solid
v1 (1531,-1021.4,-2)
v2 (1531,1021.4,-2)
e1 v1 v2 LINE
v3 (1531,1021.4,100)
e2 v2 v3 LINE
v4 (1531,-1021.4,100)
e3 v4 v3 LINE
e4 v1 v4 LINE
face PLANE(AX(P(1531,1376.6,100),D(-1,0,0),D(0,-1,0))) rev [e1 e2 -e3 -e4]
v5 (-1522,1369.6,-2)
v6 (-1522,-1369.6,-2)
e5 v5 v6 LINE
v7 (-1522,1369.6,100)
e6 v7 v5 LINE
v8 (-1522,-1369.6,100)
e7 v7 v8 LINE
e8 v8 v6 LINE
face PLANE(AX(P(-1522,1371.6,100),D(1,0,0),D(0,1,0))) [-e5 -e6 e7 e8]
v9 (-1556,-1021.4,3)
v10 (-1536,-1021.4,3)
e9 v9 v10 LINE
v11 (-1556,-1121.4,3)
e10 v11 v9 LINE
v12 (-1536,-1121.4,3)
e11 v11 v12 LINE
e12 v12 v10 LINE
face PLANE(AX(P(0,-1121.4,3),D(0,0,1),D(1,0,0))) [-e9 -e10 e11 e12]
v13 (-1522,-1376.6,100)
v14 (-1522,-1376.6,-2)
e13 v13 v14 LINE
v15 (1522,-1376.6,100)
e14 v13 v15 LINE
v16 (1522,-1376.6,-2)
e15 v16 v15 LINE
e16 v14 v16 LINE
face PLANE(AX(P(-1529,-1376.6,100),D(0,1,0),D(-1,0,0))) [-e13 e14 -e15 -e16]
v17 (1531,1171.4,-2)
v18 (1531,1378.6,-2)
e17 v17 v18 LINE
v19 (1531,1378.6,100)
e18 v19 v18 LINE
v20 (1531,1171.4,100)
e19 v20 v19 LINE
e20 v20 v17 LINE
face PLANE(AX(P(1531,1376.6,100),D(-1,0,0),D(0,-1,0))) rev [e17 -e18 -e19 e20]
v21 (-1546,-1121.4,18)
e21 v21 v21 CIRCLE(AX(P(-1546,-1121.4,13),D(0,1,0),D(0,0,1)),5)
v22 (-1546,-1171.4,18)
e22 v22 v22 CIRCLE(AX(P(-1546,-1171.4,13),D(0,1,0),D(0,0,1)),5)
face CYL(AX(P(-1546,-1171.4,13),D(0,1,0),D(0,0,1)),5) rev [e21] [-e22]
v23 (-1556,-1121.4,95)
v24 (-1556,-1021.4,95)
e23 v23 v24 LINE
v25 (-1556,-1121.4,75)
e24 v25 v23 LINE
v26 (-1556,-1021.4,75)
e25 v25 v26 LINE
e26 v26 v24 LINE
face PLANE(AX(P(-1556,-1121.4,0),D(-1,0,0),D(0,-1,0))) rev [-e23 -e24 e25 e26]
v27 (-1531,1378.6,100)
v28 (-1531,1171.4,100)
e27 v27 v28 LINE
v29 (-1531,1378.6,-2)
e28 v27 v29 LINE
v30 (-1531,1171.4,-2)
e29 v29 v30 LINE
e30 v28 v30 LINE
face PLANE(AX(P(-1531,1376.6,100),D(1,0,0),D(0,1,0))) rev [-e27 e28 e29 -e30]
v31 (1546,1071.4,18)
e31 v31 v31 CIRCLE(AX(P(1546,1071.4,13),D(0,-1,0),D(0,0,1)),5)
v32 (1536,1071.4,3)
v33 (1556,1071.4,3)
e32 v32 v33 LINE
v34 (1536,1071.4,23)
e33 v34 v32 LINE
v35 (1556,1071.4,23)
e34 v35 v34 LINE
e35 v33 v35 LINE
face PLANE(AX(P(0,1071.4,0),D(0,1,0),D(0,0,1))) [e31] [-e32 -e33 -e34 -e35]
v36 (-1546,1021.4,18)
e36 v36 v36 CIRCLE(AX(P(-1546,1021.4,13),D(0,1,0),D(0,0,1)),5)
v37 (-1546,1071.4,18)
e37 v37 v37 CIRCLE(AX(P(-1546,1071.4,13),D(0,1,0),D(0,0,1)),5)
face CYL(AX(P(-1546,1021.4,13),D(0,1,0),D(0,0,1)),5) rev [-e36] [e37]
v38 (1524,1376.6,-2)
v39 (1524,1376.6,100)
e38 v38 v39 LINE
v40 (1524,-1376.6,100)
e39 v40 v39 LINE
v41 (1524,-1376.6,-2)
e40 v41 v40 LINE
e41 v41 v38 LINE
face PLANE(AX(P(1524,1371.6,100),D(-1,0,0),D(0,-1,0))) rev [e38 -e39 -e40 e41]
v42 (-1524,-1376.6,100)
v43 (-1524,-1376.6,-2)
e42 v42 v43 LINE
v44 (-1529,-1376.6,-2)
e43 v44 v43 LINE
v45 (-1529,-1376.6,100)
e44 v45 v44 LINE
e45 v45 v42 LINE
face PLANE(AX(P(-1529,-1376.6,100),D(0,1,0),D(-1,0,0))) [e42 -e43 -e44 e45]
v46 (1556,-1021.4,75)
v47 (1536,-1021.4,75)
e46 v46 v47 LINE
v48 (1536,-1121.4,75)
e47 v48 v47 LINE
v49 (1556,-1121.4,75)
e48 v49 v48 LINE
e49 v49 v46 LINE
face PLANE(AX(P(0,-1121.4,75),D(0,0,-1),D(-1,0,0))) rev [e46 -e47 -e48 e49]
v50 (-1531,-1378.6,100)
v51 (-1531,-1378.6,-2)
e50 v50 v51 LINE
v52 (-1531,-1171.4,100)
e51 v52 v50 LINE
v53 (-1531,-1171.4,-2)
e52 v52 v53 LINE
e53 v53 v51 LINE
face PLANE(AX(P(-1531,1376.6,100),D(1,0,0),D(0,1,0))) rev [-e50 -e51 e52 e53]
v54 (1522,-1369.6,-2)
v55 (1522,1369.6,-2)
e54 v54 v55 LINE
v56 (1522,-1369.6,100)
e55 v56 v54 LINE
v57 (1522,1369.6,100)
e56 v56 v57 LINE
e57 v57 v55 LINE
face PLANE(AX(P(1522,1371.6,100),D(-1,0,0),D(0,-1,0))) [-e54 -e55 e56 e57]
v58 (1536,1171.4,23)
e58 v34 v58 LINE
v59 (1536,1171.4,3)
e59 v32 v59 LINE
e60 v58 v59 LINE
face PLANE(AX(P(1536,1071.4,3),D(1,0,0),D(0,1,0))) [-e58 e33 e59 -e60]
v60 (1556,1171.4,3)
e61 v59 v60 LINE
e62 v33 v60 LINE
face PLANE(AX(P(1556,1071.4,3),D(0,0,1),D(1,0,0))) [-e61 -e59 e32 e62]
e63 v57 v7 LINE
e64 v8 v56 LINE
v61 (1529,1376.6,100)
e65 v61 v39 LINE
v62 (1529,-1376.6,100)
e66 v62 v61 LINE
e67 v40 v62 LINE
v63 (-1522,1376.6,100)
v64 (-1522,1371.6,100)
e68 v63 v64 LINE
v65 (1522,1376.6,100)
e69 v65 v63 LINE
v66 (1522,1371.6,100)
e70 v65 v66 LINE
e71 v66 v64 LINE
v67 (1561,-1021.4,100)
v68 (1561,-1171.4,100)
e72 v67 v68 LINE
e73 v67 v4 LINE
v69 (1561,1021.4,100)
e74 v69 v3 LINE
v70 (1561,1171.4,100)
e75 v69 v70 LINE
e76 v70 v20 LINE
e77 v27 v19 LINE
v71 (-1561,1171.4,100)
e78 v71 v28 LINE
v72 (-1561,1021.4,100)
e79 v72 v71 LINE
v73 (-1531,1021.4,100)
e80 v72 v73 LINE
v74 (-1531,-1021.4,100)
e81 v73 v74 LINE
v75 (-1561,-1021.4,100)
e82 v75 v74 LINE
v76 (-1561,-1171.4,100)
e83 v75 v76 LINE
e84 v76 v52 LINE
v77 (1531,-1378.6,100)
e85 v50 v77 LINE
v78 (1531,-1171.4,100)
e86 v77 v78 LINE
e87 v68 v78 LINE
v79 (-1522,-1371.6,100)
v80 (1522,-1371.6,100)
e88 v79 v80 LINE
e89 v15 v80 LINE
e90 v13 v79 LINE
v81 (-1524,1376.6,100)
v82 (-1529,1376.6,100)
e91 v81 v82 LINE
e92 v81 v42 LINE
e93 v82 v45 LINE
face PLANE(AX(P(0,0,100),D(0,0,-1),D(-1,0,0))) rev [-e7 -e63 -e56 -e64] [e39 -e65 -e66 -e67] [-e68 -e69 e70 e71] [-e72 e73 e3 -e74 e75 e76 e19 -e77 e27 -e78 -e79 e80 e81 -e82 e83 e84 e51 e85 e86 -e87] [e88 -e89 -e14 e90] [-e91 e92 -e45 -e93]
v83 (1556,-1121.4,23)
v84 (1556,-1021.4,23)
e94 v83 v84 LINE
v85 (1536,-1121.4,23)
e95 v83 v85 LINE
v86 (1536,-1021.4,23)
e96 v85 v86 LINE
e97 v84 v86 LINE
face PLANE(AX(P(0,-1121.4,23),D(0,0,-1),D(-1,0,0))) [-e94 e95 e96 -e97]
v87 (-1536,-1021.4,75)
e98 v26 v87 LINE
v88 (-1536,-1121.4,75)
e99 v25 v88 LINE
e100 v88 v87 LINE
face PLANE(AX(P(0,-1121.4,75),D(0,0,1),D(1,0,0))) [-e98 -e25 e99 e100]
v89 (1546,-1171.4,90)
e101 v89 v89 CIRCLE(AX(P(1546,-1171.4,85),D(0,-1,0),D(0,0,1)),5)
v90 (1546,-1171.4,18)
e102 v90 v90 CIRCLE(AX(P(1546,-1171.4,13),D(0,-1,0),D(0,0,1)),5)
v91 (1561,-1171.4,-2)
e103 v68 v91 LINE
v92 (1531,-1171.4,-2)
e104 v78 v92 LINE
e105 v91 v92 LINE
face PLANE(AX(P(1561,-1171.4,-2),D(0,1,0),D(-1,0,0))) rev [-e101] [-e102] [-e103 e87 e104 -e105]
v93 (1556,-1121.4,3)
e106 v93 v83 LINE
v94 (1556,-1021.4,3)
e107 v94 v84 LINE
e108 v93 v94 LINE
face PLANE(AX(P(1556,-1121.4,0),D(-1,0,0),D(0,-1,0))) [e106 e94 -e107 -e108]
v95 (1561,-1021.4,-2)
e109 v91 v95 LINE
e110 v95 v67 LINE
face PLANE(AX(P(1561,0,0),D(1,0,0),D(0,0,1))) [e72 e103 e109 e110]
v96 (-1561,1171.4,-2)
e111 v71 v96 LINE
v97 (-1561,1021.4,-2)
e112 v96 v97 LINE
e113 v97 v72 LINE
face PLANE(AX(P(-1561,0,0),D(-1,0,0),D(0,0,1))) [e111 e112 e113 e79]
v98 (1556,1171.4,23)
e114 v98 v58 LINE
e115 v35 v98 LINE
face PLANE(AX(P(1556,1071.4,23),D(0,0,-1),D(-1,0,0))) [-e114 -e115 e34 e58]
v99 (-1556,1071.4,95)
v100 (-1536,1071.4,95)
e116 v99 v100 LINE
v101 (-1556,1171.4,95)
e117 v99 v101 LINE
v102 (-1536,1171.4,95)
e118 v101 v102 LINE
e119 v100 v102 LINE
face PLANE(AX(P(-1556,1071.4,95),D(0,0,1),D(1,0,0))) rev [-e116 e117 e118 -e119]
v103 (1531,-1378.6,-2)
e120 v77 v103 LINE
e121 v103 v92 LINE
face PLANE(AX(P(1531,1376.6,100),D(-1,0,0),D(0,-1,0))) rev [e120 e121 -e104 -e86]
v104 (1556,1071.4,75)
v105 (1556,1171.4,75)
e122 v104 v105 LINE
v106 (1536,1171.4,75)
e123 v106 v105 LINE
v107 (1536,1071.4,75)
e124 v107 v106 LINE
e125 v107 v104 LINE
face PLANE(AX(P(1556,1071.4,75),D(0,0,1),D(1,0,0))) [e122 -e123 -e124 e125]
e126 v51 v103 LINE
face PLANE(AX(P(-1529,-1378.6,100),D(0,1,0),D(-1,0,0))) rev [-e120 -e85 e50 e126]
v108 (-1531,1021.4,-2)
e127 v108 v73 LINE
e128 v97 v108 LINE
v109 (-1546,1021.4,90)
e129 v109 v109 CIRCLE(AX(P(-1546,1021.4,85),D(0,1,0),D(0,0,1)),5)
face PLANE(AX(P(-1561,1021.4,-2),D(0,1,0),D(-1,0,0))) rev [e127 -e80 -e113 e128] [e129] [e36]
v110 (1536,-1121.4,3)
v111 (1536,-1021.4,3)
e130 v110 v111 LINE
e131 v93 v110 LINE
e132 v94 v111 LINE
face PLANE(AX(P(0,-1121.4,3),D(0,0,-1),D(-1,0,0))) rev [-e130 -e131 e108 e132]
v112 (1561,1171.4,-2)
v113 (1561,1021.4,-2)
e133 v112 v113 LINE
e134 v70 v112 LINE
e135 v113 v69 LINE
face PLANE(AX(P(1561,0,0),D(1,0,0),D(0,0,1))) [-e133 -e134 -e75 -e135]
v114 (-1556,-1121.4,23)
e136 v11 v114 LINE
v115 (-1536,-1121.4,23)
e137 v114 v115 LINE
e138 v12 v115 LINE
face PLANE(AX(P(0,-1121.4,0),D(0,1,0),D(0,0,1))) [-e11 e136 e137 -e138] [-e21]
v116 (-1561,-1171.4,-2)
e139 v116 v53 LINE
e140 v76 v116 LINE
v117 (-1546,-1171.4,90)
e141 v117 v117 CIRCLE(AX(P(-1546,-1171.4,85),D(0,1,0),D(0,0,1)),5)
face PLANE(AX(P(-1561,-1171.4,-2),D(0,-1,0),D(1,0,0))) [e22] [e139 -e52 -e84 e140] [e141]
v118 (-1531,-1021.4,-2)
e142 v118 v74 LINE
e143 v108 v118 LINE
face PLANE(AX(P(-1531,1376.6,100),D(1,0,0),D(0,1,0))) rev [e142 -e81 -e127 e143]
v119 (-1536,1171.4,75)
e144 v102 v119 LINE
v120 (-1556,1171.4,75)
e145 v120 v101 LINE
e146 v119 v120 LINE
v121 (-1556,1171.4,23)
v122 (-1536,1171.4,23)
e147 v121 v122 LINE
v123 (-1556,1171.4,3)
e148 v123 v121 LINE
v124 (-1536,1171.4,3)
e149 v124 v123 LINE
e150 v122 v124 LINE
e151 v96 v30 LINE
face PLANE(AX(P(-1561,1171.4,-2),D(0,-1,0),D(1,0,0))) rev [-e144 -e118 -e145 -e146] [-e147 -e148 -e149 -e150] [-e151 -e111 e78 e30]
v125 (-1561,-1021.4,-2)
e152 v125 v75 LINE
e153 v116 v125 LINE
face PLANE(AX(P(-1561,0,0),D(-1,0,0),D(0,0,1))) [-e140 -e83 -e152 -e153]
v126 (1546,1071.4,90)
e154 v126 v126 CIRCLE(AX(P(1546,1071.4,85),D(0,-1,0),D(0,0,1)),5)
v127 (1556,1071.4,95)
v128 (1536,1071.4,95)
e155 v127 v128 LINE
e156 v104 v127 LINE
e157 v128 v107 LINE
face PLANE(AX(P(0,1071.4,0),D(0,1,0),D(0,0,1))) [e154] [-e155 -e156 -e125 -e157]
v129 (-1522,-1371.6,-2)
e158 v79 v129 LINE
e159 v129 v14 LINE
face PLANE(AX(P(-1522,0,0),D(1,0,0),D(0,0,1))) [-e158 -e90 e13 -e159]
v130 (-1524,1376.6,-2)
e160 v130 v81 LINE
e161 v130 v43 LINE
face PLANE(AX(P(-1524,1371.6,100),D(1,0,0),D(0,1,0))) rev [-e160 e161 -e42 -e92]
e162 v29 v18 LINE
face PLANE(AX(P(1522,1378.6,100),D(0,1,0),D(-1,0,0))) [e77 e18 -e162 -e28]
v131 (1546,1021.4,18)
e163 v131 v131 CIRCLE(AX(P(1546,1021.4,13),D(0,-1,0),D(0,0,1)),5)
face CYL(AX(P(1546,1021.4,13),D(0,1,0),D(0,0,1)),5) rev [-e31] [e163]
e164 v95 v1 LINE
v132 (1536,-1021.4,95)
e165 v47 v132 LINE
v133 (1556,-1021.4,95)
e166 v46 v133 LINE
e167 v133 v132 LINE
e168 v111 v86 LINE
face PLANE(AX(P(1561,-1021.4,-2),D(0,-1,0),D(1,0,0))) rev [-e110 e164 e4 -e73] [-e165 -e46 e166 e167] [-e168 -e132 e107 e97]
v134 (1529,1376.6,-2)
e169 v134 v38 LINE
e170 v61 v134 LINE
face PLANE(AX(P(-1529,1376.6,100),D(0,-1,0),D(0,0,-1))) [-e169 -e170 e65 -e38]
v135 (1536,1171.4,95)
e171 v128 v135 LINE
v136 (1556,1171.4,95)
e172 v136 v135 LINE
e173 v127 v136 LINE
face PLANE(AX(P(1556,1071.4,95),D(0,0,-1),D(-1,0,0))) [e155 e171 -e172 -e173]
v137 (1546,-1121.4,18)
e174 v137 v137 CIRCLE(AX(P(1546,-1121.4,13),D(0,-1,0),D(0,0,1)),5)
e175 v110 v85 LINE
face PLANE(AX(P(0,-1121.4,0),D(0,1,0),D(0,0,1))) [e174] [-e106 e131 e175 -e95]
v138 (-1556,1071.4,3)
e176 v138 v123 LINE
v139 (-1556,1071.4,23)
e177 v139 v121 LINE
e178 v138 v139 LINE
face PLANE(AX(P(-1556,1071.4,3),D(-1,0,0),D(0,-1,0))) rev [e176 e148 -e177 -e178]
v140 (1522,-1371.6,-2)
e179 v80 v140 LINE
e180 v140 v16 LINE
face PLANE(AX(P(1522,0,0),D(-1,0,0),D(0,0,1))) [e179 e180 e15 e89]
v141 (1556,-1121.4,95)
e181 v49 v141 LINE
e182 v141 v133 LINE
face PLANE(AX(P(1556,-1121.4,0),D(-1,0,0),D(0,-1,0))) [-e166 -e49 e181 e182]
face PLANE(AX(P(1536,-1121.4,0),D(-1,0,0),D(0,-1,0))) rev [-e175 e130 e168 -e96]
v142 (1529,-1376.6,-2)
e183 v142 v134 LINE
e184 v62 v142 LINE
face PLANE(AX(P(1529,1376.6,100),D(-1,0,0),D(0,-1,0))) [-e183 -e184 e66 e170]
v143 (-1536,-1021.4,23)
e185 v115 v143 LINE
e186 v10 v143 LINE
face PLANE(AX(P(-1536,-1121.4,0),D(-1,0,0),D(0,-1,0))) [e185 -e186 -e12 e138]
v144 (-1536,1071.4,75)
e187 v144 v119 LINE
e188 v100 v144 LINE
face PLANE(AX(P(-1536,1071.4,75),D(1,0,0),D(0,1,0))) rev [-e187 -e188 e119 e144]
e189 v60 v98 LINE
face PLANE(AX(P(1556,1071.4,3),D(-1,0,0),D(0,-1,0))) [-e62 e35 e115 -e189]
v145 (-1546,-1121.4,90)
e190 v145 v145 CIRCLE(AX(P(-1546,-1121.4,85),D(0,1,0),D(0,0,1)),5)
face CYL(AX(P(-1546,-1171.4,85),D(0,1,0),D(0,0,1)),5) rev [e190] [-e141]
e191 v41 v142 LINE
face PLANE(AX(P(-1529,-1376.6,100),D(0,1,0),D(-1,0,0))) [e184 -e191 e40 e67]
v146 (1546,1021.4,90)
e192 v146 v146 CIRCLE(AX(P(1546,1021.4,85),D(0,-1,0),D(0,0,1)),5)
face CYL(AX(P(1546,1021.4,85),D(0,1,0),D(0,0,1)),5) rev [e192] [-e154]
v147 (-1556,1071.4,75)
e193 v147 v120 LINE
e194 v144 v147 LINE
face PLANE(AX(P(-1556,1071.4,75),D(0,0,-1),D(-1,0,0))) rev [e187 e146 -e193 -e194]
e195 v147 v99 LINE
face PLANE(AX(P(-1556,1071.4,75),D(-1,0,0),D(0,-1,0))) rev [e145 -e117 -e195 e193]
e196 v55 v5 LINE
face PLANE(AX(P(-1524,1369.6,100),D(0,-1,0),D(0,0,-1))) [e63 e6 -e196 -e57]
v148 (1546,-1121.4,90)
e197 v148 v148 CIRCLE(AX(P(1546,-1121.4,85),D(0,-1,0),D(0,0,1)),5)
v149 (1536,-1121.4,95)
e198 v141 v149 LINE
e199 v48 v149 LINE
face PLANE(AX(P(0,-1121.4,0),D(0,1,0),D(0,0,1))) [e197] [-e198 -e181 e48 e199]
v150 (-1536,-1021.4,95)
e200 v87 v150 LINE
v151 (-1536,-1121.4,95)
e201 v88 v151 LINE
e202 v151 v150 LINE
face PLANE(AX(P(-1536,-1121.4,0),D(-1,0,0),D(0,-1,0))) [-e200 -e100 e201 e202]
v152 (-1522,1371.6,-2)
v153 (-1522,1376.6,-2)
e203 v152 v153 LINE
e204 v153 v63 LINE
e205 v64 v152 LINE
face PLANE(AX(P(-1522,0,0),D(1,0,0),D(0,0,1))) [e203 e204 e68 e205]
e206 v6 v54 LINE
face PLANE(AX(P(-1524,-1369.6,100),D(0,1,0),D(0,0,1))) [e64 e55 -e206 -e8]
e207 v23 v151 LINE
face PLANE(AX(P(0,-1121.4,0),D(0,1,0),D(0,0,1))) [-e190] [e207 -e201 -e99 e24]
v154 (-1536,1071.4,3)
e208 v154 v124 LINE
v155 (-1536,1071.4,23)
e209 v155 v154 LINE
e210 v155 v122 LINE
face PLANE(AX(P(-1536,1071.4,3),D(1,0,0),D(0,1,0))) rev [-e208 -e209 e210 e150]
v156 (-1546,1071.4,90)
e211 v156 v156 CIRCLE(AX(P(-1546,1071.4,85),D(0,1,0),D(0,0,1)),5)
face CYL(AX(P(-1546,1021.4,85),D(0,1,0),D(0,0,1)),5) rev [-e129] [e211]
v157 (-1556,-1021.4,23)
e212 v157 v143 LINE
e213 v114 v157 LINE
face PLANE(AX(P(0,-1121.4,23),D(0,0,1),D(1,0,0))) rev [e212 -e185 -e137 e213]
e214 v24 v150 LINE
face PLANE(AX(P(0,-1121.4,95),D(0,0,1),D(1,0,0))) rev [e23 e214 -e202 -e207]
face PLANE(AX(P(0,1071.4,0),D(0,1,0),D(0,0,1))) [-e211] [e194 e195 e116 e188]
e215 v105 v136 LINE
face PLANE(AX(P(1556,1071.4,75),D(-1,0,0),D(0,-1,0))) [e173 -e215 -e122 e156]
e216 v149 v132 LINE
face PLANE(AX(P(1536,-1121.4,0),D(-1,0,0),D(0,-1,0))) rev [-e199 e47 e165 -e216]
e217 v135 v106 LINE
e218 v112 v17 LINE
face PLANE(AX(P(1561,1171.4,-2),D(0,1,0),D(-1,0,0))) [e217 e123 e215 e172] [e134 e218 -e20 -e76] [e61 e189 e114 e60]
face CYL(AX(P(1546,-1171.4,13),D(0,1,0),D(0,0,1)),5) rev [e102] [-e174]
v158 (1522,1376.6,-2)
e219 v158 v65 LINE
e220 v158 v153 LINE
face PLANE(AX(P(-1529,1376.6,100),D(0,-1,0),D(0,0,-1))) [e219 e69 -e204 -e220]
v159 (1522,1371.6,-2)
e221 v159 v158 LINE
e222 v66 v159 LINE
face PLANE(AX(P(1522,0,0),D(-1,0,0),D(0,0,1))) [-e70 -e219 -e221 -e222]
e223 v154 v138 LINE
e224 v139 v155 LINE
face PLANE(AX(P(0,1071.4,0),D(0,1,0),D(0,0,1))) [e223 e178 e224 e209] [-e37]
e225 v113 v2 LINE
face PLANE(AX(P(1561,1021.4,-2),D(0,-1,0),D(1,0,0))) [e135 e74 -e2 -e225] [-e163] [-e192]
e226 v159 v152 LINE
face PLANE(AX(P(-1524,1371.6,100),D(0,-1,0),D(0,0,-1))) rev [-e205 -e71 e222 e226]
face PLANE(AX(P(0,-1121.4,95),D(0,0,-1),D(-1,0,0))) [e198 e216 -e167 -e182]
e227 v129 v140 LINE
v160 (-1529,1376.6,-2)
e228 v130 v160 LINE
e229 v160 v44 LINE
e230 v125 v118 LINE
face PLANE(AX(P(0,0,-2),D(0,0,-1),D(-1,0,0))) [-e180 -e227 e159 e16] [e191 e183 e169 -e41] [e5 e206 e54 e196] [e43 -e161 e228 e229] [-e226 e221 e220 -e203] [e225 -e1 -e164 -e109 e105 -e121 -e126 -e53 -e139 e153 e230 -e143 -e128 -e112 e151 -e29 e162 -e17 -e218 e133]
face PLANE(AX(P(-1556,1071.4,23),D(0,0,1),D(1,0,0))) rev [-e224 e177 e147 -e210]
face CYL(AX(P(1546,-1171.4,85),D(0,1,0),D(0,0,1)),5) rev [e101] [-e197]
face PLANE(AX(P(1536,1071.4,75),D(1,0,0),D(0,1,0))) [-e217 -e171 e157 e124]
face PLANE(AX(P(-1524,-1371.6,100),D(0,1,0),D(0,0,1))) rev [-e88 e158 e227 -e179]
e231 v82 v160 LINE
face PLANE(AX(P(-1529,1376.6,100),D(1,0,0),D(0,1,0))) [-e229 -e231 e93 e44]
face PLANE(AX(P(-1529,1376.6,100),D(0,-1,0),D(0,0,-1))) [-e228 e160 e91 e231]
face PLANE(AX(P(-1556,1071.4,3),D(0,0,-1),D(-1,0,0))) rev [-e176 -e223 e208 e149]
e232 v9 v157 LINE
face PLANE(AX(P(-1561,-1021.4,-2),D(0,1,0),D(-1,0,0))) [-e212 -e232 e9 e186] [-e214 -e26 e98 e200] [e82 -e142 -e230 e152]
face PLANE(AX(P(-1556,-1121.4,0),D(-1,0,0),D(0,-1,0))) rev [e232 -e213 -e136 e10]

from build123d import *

# Parameters (mm, degrees)
SKETCH1_W               = 3058
SKETCH1_H               = 2753.2
SKETCH1_W_2             = 3048
SKETCH1_H_2             = 2743.2
BOSS_EXTRUDE1_DEPTH     = 100
SHELL4_T                = 2
SKETCH2_W               = 3058
SKETCH2_H               = 2753.2
SKETCH2_W_2             = 3048
SKETCH2_H_2             = 2743.2
CUT_EXTRUDE5_DEPTH      = 5
SKETCH3_W               = 102
SKETCH3_H               = 150
BOSS_EXTRUDE2_DEPTH     = 30
SKETCH4_W               = 20
SKETCH4_H               = 20
CUT_EXTRUDE6_DEPTH      = 100
SKETCH5_R               = 5
CUT_EXTRUDE7_DEPTH      = 50
SKETCH7_W               = 20
SKETCH7_H               = 20
CUT_EXTRUDE9_DEPTH      = 100
SKETCH9_R               = 5
CUT_EXTRUDE10_DEPTH     = 50
SKETCH8_R               = 5
CUT_EXTRUDE11_DEPTH     = 50
MIRROR2_START           = 1021.4
MIRROR2_OUTLINE_W       = 30
MIRROR2_OUTLINE_H       = 102
MIRROR2_DEPTH           = 150
MIRROR2_START_2         = -1171.4
MIRROR2_2_OUTLINE_W     = 30
MIRROR2_2_OUTLINE_H     = 102
MIRROR2_2_OUTLINE_W_2   = 20
MIRROR2_2_OUTLINE_H_2   = 20
MIRROR2_2_DEPTH         = 150
MIRROR2_3_OUTLINE_W     = 20
MIRROR2_3_OUTLINE_H     = 20
MIRROR2_3_OUTLINE_R     = 5
MIRROR2_3_DEPTH         = 50
SKETCH10_W              = 102
SKETCH10_H              = 7
BOSS_EXTRUDE3_DEPTH     = 2
MIRROR5_COPY_1_SKETCH_W = 102
MIRROR5_COPY_1_SKETCH_H = 7
MIRROR5_COPY_1_DEPTH    = 2


with BuildPart() as part:
    # Sketch1 → Boss-Extrude1 (new body)
    with BuildSketch(Plane.XY):
        Rectangle(SKETCH1_W, SKETCH1_H)
        Rectangle(SKETCH1_W_2, SKETCH1_H_2, mode=Mode.SUBTRACT)
    extrude(amount=BOSS_EXTRUDE1_DEPTH)

    # Shell4
    shell4_openings = [part.faces().sort_by_distance(p)[0] for p in [
        (-1524.885212735, 0, 100),
    ]]
    offset(amount=SHELL4_T, openings=shell4_openings, kind=Kind.INTERSECTION)

    # Sketch2 → Cut-Extrude5 (cut, symmetric)
    with BuildSketch(Plane.XY):
        Rectangle(SKETCH2_W, SKETCH2_H)
        Rectangle(SKETCH2_W_2, SKETCH2_H_2, mode=Mode.SUBTRACT)
    extrude(amount=CUT_EXTRUDE5_DEPTH, both=True, mode=Mode.SUBTRACT)


with BuildPart() as cut_extrude5_piece_1:
    # of the separate pieces the step leaves, piece 1, a body of its own (cut_extrude5_pieces)
    add(part.part.solids().sort_by_distance((-1529, -1376.6, -2))[0])

    # Sketch3 → Boss-Extrude2 (add)
    with BuildSketch(Plane.ZY.offset(1531)):
        with Locations((49, 1096.4)):
            Rectangle(SKETCH3_W, SKETCH3_H)
    boss_extrude2 = extrude(amount=BOSS_EXTRUDE2_DEPTH)

    # Mirror1: Boss-Extrude2 across plane
    add(boss_extrude2.mirror(Plane.ZX))

    # Sketch4 → Cut-Extrude6 (cut)
    with BuildSketch(Plane(origin=(0, 1171.4, 0), x_dir=(1, 0, 0), z_dir=(0, 1, 0))):
        with Locations((-1546, -85)):
            Rectangle(SKETCH4_W, SKETCH4_H)
        with Locations((-1546, -13)):
            Rectangle(SKETCH4_W, SKETCH4_H)
    cut_extrude6 = extrude(amount=-CUT_EXTRUDE6_DEPTH, mode=Mode.SUBTRACT)

    # Sketch5 → Cut-Extrude7 (cut)
    with BuildSketch(Plane(origin=(0, 1071.4, 0), x_dir=(1, 0, 0), z_dir=(0, 1, 0))):
        with Locations(Location((-1546, -85, 0), (0, 0, 270))):
            Circle(SKETCH5_R)
        with Locations(Location((-1546, -13, 0), (0, 0, 270))):
            Circle(SKETCH5_R)
    cut_extrude7 = extrude(amount=-CUT_EXTRUDE7_DEPTH, mode=Mode.SUBTRACT)

    # Sketch7 → Cut-Extrude9 (cut)
    with BuildSketch(Plane(origin=(0, -1021.4, 0), x_dir=(1, 0, 0), z_dir=(0, 1, 0))):
        with Locations((-1546, -85)):
            Rectangle(SKETCH7_W, SKETCH7_H)
        with Locations((-1546, -13)):
            Rectangle(SKETCH7_W, SKETCH7_H)
    extrude(amount=-CUT_EXTRUDE9_DEPTH, mode=Mode.SUBTRACT)

    # Sketch9 → Cut-Extrude10 (cut)
    with BuildSketch(Plane(origin=(0, -1121.4, 0), x_dir=(1, 0, 0), z_dir=(0, 1, 0))):
        with Locations(Location((-1546, -13, 0), (0, 0, 270))):
            Circle(SKETCH9_R)
    extrude(amount=-CUT_EXTRUDE10_DEPTH, mode=Mode.SUBTRACT)

    # Sketch8 → Cut-Extrude11 (cut)
    with BuildSketch(Plane(origin=(0, -1121.4, 0), x_dir=(1, 0, 0), z_dir=(0, 1, 0))):
        with Locations(Location((-1546, -85, 0), (0, 0, 270))):
            Circle(SKETCH8_R)
    extrude(amount=-CUT_EXTRUDE11_DEPTH, mode=Mode.SUBTRACT)

    # Mirror2: read off the stored shape, not the designer's step
    # Mirror2 outline → Mirror2 (add)
    with BuildSketch(Plane(origin=(0, 0, 0), x_dir=(1, 0, 0), z_dir=(0, 1, 0)).offset(MIRROR2_START)):
        with Locations((1546, -49)):
            Rectangle(MIRROR2_OUTLINE_W, MIRROR2_OUTLINE_H)
    extrude(amount=MIRROR2_DEPTH)

    # Mirror2 2 outline → Mirror2 2 (add)
    with BuildSketch(Plane(origin=(0, 0, 0), x_dir=(1, 0, 0), z_dir=(0, 1, 0)).offset(MIRROR2_START_2)):
        with Locations((1546, -49)):
            Rectangle(MIRROR2_2_OUTLINE_W, MIRROR2_2_OUTLINE_H)
        with Locations((1546, -85)):
            Rectangle(MIRROR2_2_OUTLINE_W_2, MIRROR2_2_OUTLINE_H_2, mode=Mode.SUBTRACT)
        with Locations((1546, -13)):
            Rectangle(MIRROR2_2_OUTLINE_W_2, MIRROR2_2_OUTLINE_H_2, mode=Mode.SUBTRACT)
    extrude(amount=MIRROR2_2_DEPTH)

    # Mirror2 3 outline → Mirror2 3 (add)
    # profile 1 of 2: a face of its own
    with BuildSketch(Plane(origin=(0, 0, 0), x_dir=(1, 0, 0), z_dir=(0, 1, 0)).offset(MIRROR2_START_2)):
        with Locations((1546, -85)):
            Rectangle(MIRROR2_3_OUTLINE_W, MIRROR2_3_OUTLINE_H)
        with Locations((1546, -85)):
            Circle(MIRROR2_3_OUTLINE_R, mode=Mode.SUBTRACT)
    # profile 2 of 2: a face of its own
    with BuildSketch(Plane(origin=(0, 0, 0), x_dir=(1, 0, 0), z_dir=(0, 1, 0)).offset(MIRROR2_START_2)):
        with Locations((1546, -13)):
            Rectangle(MIRROR2_3_OUTLINE_W, MIRROR2_3_OUTLINE_H)
        with Locations((1546, -13)):
            Circle(MIRROR2_3_OUTLINE_R, mode=Mode.SUBTRACT)
    extrude(amount=MIRROR2_3_DEPTH)

    # Mirror3: Cut-Extrude6, Cut-Extrude7 across plane
    add(cut_extrude6.mirror(Plane(origin=(0, 0, 0), x_dir=(0, 0, 1), z_dir=(1, 0, 0))), mode=Mode.SUBTRACT)
    add(cut_extrude7.mirror(Plane(origin=(0, 0, 0), x_dir=(0, 0, 1), z_dir=(1, 0, 0))), mode=Mode.SUBTRACT)



with BuildPart() as cut_extrude5_piece_2:
    # of the separate pieces the step leaves, piece 2, a body of its own (cut_extrude5_pieces)
    add(part.part.solids().sort_by_distance((-1524, 1371.6, -2))[0])


with BuildPart() as cut_extrude5_piece_1_1:
    add(cut_extrude5_piece_1.part)

    add(cut_extrude5_piece_2.part)  # Boss-Extrude3 merges Cut-Extrude5 piece 2
    # Sketch10 → Boss-Extrude3 (add)
    with BuildSketch(Plane(origin=(1524, 0, 0), x_dir=(0, 0, -1), z_dir=(1, 0, 0))):
        with Locations((-49, 1375.1)):
            Rectangle(SKETCH10_W, SKETCH10_H)
    boss_extrude3 = extrude(amount=-BOSS_EXTRUDE3_DEPTH)

    # Mirror4: Boss-Extrude3 across plane
    add(boss_extrude3.mirror(Plane.ZX))

    # Mirror5: Boss-Extrude3 across plane
    add(boss_extrude3.mirror(Plane(origin=(0, 0, 0), x_dir=(0, 0, 1), z_dir=(1, 0, 0))))

    # Mirror5 copy 1 sketch → Mirror5 copy 1 (add)
    with BuildSketch(Plane(origin=(-1524, 0, 0), x_dir=(0, 0, -1), z_dir=(-1, 0, 0))):
        with Locations((-49, 1375.1)):
            Rectangle(MIRROR5_COPY_1_SKETCH_W, MIRROR5_COPY_1_SKETCH_H)
    extrude(amount=-MIRROR5_COPY_1_DEPTH)


solid = cut_extrude5_piece_1_1.part
